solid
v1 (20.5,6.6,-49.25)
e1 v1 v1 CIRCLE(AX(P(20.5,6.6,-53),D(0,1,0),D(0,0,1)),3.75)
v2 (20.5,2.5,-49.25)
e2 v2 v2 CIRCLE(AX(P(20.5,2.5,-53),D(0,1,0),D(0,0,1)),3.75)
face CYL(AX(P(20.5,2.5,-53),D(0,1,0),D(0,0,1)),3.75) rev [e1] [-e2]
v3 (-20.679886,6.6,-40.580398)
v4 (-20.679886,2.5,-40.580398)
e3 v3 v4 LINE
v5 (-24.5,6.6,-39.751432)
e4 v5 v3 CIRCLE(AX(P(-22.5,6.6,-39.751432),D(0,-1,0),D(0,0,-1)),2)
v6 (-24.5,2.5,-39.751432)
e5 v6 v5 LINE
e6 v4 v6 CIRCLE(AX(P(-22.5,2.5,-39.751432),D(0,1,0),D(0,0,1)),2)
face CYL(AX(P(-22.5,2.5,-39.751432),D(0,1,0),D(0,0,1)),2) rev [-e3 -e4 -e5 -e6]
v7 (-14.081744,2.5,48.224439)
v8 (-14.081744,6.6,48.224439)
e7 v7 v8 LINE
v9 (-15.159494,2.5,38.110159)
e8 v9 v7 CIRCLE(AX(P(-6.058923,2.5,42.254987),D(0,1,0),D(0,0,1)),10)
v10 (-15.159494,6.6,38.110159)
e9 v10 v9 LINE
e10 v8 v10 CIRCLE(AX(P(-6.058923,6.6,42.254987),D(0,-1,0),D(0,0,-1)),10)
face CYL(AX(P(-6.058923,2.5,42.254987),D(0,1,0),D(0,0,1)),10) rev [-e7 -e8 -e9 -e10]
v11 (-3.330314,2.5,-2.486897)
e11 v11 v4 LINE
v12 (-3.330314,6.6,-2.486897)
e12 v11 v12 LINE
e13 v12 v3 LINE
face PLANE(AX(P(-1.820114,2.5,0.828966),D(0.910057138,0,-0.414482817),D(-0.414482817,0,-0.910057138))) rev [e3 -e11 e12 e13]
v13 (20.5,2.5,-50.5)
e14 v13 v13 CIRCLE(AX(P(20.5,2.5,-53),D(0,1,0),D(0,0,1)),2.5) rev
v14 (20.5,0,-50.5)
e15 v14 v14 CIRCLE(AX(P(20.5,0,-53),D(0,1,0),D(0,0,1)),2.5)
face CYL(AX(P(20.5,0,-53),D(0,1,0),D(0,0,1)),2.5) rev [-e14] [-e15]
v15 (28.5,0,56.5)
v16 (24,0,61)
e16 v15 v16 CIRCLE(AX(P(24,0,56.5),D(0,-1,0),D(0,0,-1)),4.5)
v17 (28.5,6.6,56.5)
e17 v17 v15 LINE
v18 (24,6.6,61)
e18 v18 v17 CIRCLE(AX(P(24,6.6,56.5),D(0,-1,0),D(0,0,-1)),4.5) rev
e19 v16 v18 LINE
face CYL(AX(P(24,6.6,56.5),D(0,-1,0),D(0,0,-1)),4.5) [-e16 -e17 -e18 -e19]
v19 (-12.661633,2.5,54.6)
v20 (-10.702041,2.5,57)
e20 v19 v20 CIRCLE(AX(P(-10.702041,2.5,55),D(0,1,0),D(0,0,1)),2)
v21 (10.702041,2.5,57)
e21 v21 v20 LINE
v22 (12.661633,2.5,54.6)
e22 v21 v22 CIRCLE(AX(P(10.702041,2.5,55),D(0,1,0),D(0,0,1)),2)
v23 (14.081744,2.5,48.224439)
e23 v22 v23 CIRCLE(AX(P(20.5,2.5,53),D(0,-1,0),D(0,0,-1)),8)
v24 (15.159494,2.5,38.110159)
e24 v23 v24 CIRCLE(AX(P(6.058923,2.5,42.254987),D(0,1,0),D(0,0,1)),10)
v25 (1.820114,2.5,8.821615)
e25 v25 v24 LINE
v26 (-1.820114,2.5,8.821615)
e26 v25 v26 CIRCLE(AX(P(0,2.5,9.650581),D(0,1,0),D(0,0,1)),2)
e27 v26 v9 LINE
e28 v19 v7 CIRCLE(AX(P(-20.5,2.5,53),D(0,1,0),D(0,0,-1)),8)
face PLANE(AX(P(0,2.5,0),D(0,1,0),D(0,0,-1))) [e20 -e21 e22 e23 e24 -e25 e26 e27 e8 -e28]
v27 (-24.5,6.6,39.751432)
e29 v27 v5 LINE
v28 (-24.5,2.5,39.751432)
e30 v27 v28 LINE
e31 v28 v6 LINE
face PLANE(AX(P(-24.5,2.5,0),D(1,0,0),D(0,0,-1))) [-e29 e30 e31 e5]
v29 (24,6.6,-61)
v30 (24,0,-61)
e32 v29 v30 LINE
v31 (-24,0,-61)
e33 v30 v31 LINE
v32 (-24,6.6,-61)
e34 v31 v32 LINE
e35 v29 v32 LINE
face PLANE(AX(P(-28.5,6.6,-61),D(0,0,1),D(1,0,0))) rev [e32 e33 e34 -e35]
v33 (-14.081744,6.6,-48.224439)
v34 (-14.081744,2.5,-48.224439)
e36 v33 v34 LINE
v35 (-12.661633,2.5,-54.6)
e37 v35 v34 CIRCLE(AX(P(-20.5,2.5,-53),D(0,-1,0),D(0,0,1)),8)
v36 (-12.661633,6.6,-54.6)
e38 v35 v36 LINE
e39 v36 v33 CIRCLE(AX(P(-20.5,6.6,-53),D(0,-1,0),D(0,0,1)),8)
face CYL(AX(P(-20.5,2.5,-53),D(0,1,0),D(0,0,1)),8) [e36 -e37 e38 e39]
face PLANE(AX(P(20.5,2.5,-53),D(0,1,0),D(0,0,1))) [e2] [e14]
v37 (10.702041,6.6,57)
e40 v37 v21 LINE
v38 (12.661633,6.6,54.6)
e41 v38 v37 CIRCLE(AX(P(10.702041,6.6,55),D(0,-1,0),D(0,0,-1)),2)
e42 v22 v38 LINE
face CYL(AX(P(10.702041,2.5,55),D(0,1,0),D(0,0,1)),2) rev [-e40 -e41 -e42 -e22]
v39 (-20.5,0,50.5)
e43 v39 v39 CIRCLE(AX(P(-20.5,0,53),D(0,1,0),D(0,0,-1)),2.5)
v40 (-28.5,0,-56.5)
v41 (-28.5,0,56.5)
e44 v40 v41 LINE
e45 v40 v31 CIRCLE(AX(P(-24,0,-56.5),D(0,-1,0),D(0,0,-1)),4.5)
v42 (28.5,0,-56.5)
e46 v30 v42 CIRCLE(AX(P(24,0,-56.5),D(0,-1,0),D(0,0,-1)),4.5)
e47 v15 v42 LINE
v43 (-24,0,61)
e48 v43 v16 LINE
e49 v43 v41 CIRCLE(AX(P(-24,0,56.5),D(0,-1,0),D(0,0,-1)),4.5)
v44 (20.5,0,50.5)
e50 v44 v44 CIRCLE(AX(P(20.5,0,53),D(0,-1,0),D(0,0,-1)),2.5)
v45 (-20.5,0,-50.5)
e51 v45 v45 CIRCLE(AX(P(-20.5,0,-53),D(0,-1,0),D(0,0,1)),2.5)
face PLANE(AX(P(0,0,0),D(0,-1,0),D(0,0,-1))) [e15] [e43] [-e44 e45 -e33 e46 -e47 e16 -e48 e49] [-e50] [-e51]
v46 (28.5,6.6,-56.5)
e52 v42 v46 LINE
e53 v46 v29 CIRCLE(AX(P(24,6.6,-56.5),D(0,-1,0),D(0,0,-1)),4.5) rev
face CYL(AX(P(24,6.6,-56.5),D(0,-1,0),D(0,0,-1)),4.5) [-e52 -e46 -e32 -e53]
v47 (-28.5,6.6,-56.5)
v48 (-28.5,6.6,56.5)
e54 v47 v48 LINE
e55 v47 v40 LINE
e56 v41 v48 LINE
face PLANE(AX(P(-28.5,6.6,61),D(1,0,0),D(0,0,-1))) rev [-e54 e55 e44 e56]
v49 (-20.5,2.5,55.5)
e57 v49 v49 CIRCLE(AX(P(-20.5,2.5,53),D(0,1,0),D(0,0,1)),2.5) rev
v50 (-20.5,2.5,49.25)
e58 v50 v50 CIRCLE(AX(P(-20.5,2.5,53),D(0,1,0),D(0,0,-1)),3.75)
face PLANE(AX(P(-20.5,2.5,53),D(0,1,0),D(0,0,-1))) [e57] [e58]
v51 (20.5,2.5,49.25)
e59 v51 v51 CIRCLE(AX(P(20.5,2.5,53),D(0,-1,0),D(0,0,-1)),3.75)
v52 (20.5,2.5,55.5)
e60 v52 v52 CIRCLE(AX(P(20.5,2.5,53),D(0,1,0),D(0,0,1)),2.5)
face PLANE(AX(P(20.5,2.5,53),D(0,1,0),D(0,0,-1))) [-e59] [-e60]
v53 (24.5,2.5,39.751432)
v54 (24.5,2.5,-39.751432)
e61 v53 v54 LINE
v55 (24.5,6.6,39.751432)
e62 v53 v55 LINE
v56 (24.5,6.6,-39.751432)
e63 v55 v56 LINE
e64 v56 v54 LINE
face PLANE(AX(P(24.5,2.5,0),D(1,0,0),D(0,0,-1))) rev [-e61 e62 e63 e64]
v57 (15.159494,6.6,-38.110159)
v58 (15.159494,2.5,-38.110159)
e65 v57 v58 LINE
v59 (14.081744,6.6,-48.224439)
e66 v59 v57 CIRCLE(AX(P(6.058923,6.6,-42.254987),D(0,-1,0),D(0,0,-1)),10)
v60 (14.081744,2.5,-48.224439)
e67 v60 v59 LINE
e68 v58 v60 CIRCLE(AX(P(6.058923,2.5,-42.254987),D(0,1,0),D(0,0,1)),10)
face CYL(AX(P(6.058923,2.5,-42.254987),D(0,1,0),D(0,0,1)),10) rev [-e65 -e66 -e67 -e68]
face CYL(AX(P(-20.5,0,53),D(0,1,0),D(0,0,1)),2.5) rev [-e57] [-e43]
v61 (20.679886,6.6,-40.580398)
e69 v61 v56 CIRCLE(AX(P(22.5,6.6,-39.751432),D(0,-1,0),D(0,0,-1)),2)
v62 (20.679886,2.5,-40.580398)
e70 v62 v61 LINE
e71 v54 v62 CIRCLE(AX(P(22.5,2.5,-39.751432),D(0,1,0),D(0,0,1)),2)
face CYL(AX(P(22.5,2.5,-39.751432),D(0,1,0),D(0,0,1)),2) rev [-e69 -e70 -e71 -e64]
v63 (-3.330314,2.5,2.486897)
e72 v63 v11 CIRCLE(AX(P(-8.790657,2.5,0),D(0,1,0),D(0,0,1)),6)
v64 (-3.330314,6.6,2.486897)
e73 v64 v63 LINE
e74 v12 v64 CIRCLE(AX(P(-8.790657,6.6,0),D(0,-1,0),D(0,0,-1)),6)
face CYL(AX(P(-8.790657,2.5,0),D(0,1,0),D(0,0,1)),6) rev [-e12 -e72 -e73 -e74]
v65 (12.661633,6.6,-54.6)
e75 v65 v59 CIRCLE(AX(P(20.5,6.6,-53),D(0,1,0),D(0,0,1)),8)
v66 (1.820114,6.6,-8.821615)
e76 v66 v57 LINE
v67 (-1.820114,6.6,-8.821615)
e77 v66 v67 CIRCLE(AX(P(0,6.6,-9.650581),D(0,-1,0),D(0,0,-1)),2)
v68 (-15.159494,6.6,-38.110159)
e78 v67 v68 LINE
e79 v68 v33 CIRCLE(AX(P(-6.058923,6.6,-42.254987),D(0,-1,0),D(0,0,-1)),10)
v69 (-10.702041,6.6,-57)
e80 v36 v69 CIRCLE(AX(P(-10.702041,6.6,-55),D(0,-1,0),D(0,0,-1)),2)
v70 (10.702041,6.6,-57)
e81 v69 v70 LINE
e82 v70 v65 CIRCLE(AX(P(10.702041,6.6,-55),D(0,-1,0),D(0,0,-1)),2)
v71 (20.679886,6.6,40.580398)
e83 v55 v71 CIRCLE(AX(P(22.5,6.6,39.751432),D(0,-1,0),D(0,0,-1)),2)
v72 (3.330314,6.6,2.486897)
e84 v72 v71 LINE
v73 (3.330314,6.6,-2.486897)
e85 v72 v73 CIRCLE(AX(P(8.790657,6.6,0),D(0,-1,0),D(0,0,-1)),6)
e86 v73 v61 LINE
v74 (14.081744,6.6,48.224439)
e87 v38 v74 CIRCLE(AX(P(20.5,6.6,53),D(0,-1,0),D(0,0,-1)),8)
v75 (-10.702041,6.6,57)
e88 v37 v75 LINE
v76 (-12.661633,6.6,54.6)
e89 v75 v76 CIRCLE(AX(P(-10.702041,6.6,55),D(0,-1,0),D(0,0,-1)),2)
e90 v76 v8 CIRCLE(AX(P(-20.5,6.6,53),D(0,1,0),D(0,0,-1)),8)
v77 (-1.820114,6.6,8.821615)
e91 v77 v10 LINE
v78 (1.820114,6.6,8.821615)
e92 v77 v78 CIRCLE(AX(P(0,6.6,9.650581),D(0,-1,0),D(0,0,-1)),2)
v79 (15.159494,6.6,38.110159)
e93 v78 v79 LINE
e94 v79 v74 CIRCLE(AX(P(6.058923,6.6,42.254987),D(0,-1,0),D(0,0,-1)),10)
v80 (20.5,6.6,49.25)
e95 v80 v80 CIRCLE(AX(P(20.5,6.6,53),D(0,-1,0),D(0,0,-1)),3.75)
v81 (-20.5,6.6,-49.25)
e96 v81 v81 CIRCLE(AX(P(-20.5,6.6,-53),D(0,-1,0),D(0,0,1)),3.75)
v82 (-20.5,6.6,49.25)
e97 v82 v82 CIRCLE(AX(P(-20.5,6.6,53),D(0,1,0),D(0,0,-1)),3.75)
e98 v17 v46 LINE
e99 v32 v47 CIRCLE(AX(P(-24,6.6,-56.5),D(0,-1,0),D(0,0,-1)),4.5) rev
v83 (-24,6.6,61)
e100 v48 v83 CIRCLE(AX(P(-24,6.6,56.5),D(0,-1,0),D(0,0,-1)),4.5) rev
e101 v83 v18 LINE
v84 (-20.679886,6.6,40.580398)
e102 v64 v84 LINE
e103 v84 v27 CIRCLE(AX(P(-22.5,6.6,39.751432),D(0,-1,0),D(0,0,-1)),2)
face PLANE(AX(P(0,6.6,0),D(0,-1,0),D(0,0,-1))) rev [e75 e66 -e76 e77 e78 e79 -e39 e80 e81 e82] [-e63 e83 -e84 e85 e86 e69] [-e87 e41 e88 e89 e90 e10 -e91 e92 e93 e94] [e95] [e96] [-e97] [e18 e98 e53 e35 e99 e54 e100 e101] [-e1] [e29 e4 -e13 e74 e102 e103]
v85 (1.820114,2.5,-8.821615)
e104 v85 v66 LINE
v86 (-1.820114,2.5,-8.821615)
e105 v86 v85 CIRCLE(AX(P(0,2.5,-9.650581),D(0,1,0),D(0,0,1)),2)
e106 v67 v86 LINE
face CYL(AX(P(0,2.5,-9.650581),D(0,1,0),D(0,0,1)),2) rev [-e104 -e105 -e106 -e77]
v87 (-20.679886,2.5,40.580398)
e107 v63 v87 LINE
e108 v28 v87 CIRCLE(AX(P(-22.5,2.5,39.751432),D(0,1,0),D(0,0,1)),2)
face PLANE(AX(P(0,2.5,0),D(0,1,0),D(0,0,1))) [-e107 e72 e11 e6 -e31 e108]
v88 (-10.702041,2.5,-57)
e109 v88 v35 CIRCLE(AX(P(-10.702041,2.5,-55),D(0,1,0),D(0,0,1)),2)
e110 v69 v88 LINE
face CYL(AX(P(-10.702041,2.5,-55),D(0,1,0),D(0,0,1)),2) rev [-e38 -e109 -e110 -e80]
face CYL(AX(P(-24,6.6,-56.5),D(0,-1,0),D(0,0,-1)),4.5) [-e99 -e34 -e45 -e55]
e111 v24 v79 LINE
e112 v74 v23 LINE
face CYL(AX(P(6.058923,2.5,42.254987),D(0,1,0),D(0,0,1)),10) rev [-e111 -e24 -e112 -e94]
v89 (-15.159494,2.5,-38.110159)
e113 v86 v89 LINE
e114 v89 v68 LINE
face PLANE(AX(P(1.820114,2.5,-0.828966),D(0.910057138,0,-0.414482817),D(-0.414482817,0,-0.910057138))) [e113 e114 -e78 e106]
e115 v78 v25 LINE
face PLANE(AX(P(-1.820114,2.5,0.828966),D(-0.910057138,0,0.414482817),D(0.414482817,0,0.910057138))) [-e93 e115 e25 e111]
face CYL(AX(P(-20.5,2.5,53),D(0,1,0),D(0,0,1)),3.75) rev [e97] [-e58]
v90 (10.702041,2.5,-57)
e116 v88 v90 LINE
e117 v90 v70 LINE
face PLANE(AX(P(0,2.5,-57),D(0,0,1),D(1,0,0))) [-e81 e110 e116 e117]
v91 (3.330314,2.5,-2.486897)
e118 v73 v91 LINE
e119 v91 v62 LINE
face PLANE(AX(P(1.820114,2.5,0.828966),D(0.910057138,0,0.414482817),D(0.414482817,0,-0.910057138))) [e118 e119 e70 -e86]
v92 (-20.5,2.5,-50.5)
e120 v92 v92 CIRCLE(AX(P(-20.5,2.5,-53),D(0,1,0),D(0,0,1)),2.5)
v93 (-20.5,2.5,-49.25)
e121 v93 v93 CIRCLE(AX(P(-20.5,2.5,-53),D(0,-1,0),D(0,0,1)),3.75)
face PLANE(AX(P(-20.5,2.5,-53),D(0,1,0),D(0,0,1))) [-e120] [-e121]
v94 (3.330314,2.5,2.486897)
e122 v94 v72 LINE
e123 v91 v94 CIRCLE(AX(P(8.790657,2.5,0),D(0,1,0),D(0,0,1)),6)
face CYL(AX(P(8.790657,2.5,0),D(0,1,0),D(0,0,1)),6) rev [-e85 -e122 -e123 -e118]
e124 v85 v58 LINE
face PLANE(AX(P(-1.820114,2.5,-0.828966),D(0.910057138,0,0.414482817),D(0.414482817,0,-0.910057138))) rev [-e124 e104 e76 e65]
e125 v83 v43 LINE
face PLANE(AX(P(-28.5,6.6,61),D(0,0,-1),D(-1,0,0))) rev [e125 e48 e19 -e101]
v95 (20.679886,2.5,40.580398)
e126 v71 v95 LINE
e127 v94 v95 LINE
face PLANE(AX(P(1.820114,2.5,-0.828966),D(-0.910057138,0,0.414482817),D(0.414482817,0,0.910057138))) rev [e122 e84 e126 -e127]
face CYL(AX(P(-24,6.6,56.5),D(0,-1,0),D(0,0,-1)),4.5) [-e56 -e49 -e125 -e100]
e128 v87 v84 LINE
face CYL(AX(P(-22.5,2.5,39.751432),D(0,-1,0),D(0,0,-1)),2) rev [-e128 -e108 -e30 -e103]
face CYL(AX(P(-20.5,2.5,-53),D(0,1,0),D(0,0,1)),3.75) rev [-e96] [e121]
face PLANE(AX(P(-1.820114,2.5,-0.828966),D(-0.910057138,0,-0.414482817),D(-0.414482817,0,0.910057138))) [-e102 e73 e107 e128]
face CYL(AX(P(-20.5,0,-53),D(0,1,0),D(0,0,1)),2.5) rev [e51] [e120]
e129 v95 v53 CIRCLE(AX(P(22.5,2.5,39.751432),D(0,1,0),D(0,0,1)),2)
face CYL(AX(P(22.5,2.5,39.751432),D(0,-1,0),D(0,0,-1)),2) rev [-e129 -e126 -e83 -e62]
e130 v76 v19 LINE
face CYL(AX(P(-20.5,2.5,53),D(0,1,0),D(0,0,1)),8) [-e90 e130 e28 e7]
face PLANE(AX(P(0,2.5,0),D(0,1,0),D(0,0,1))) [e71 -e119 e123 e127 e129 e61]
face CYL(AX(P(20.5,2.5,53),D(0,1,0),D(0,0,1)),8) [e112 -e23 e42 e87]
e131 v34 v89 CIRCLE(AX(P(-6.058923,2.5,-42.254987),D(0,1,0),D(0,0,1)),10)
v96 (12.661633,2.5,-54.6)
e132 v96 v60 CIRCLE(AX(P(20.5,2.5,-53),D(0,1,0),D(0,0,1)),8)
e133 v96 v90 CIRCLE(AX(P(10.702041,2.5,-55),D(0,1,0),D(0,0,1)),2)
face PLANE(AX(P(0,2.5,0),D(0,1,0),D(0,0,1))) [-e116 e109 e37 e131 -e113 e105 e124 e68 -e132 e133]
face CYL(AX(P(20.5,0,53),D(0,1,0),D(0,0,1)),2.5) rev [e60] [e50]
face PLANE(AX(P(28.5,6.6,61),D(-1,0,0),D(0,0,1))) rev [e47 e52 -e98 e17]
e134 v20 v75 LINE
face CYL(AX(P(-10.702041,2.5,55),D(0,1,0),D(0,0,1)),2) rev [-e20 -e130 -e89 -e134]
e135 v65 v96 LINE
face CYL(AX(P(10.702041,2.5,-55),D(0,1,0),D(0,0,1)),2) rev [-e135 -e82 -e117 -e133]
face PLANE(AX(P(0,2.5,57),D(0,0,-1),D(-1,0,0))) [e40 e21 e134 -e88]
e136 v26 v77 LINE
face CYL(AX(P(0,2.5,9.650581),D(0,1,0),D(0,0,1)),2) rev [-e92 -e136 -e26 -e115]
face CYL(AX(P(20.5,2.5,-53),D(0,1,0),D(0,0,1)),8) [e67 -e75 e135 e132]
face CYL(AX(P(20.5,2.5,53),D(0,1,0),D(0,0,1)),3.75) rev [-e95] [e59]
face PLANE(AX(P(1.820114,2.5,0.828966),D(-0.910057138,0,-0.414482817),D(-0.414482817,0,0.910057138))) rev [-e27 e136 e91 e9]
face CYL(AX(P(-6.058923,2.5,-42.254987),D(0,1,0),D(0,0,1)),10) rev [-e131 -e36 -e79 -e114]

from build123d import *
from OCP.BRepFilletAPI import BRepFilletAPI_MakeFillet

# Parameters (mm, degrees)
SKETCH1_W               = 57
SKETCH1_H               = 122
BOSS_EXTRUDE1_DEPTH     = 6.6
FILLET1_R               = 4.5
SKETCH2_R               = 2.5
CUT_EXTRUDE1_DEPTH      = 68.652124874
SKETCH3_R               = 3.75
CUT_EXTRUDE2_DEPTH      = 4.1
MIRROR3_COPY_1_SKETCH_R = 2.5
MIRROR3_COPY_1_DEPTH    = 68.652124874
MIRROR3_COPY_2_SKETCH_R = 3.75
MIRROR3_COPY_2_DEPTH    = 4.1
CUT_EXTRUDE3_DEPTH      = 4.1
FILLET2_R               = 10
FILLET3_R               = 2
FILLET2_OF_MIRROR4_R    = 10
FILLET3_OF_MIRROR4_R    = 2
MIRROR5_START           = 2.5
MIRROR5_DEPTH           = 4.1
FILLET4_R1              = 2
FILLET4_R2              = 6


with BuildPart() as part:
    # Sketch1 → Boss-Extrude1 (new body)
    with BuildSketch(Plane(origin=(0, 0, 0), x_dir=(1, 0, 0), z_dir=(0, 1, 0))):
        Rectangle(SKETCH1_W, SKETCH1_H)
    extrude(amount=BOSS_EXTRUDE1_DEPTH)

    # Fillet1
    fillet1_edges = [part.edges().sort_by_distance(p)[0] for p in [
        (28.5, 3.3, 61),
        (-28.5, 3.3, 61),
        (-28.5, 3.3, -61),
        (28.5, 3.3, -61),
    ]]
    fillet(fillet1_edges, radius=FILLET1_R)

    # Sketch2 → Cut-Extrude1 (cut, through all)
    with BuildSketch(Plane(origin=(0, 6.6, 0), x_dir=(1, 0, 0), z_dir=(0, 1, 0))):
        with Locations(Location((20.5, 53, 0), (0, 0, 270))):
            Circle(SKETCH2_R)
    cut_extrude1 = extrude(amount=-CUT_EXTRUDE1_DEPTH, mode=Mode.SUBTRACT)

    # Sketch3 → Cut-Extrude2 (cut)
    with BuildSketch(Plane(origin=(0, 6.6, 0), x_dir=(1, 0, 0), z_dir=(0, 1, 0))):
        with Locations(Location((20.5, 53, 0), (0, 0, 270))):
            Circle(SKETCH3_R)
    cut_extrude2 = extrude(amount=-CUT_EXTRUDE2_DEPTH, mode=Mode.SUBTRACT)

    # Mirror1: Cut-Extrude1, Cut-Extrude2 across plane
    add(cut_extrude1.mirror(Plane(origin=(0, 0, 0), x_dir=(0, 0, 1), z_dir=(1, 0, 0))), mode=Mode.SUBTRACT)
    add(cut_extrude2.mirror(Plane(origin=(0, 0, 0), x_dir=(0, 0, 1), z_dir=(1, 0, 0))), mode=Mode.SUBTRACT)

    # Mirror3: Cut-Extrude1, Cut-Extrude2 across plane
    add(cut_extrude1.mirror(Plane.XY), mode=Mode.SUBTRACT)
    add(cut_extrude2.mirror(Plane.XY), mode=Mode.SUBTRACT)

    # Mirror3 copy 1 sketch → Mirror3 copy 1 (cut, through all)
    with BuildSketch(Plane(origin=(0, 6.6, 0), x_dir=(-1, 0, 0), z_dir=(0, 1, 0))):
        with Locations(Location((20.5, 53, 0), (0, 0, 270))):
            Circle(MIRROR3_COPY_1_SKETCH_R)
    extrude(amount=-MIRROR3_COPY_1_DEPTH, mode=Mode.SUBTRACT)

    # Mirror3 copy 2 sketch → Mirror3 copy 2 (cut)
    with BuildSketch(Plane(origin=(0, 6.6, 0), x_dir=(-1, 0, 0), z_dir=(0, 1, 0))):
        with Locations(Location((20.5, 53, 0), (0, 0, 270))):
            Circle(MIRROR3_COPY_2_SKETCH_R)
    extrude(amount=-MIRROR3_COPY_2_DEPTH, mode=Mode.SUBTRACT)

    # Sketch4 → Cut-Extrude3 (cut)
    with BuildSketch(Plane(origin=(0, 6.6, 0), x_dir=(1, 0, 0), z_dir=(0, 1, 0))):
        with BuildLine():
            Line((0, 57), (0, 4.825290504))
            Line((0, 4.825290504), (18.422458297, 45.274469567))
            ThreePointArc((18.422458297, 45.274469567), (13.107579799, 49.941875809), (13.57179677, 57))
            Line((13.57179677, 57), (0, 57))
        make_face()
        with BuildLine():
            Line((24.5, 0), (24.5, 46.07179677))
            ThreePointArc((24.5, 46.07179677), (23.697246566, 45.666677806), (22.854101194, 45.354203274))
            Line((22.854101194, 45.354203274), (2.197664208, 0))
            Line((2.197664208, 0), (24.5, 0))
        make_face()
    cut_extrude3 = extrude(amount=-CUT_EXTRUDE3_DEPTH, mode=Mode.SUBTRACT)

    # Fillet2
    # the kernel refuses this fillet: 10 mm, written as the material it adds along each edge
    with BuildSketch(Plane(origin=(22.854101194, 6.6, -45.354203274), x_dir=(0.9166652742214988, 0, -0.3996558207213108), z_dir=(0, -1, 0))) as fillet2_piece_1:
        with BuildLine():
            CenterArc((4.145887895, 9.719866853), FILLET2_R, 228.043415152, 28.362844717)
            Line((-2.539785162, 2.28335048), (-2.673498623, 2.134620152))
            Line((-2.673498623, 2.134620152), (-0.133713461, -0.148730327))
            Line((-0.133713461, -0.148730327), (0.022444109, -0.198736665))
            ThreePointArc((0.022444109, -0.198736665), (0.897764349, -0.149466597), (1.748521514, -0.194397337))
            Line((1.748521514, -0.194397337), (1.795528698, 0))
        make_face()
    extrude(amount=4.1)
    with BuildSketch(Plane(origin=(18.422458297, 6.6, -45.274469567), x_dir=(-0.41448281678671633, 0, 0.9100571380899934), z_dir=(0, -1, 0))) as fillet2_piece_2:
        with BuildLine():
            CenterArc((7.872374254, 10), FILLET2_R, 208.861826981, 61.138173019)
            Line((-0.885488916, 5.173009977), (-1.06064618, 5.076470177))
            ThreePointArc((-1.06064618, 5.076470177), (-0.203601176, 2.627440291), (-0.197294486, 0.032785449))
            Line((-0.197294486, 0.032785449), (0, -0.2))
            Line((0, -0.2), (7.872374254, -0.2))
            Line((7.872374254, -0.2), (7.872374254, 0))
        make_face()
    extrude(amount=4.1)

    # Fillet3
    # the kernel refuses this fillet: 2 mm, written as the material it adds along each edge
    with BuildSketch(Plane(origin=(13.57179677, 6.6, -57), x_dir=(-0.3545926272331019, 0, 0.9350208921259068), z_dir=(0, -1, 0))) as fillet3_piece_1:
        with BuildLine():
            CenterArc((2.887636012, 1.974096319), FILLET3_R, 159.231520484, 101.536959033)
            Line((1.017594228, 2.683281573), (0, 0))
            ThreePointArc((0, 0), (1.283393783, 0.103614726), (2.566787566, 0))
        make_face()
    extrude(amount=4.1)
    with BuildSketch(Plane(origin=(24.5, 6.6, -46.07179677), x_dir=(-0.5710655658719064, 0, 0.8209044520986588), z_dir=(0, -1, 0))) as fillet3_piece_2:
        with BuildLine():
            CenterArc((6.330546511, -1.967533641), FILLET3_R, 79.662186843, 155.513248783)
            Line((5.18841538, -3.609342545), (5.074202266, -3.773523436))
            Line((5.074202266, -3.773523436), (-0.114213113, -0.16418089))
            Line((-0.114213113, -0.16418089), (-0.061886493, 0.190184284))
            ThreePointArc((-0.061886493, 0.190184284), (4.924730005, 0.525207358), (6.725339822, 0.196753364))
            Line((6.725339822, 0.196753364), (6.689449521, 0))
        make_face()
    extrude(amount=4.1)

    # Mirror4: Cut-Extrude3 across plane
    add(cut_extrude3.mirror(Plane(origin=(0, 0, 0), x_dir=(0, 0, 1), z_dir=(1, 0, 0))), mode=Mode.SUBTRACT)

    # Fillet2 of Mirror4
    # the kernel refuses this fillet: 10 mm, written as the material it adds along each edge
    with BuildSketch(Plane(origin=(-22.854101194, 6.6, -45.354203274), x_dir=(0.4144828167867165, 0, 0.9100571380899934), z_dir=(0, -1, 0))) as fillet2_of_mirror4_piece_1:
        with BuildLine():
            CenterArc((3.415288872, 10), FILLET2_OF_MIRROR4_R, 241.637155283, 28.362844717)
            Line((-1.335247856, 1.200431784), (-1.43025859, 1.024440419))
            ThreePointArc((-1.43025859, 1.024440419), (-0.767552408, 0.489064812), (-0.149559435, -0.132785449))
            Line((-0.149559435, -0.132785449), (0, -0.2))
            Line((0, -0.2), (3.415288872, -0.2))
            Line((3.415288872, -0.2), (3.415288872, 0))
        make_face()
    extrude(amount=4.1)
    with BuildSketch(Plane(origin=(-18.422458297, 6.6, -45.274469567), x_dir=(0.8270785739825625, 0, -0.5620863211811608), z_dir=(0, -1, 0))) as fillet2_of_mirror4_piece_2:
        with BuildLine():
            CenterArc((8.528405442, 9.446723083), FILLET2_OF_MIRROR4_R, 189.713452681, 61.138173019)
            Line((-1.328233375, 7.759514966), (-1.525366151, 7.725770803))
            Line((-1.525366151, 7.725770803), (-0.197132776, -0.033744162))
            Line((-0.197132776, -0.033744162), (0.065603119, -0.188934462))
            ThreePointArc((0.065603119, -0.188934462), (2.624124751, 0.242621533), (5.182646384, -0.188934462))
            Line((5.182646384, -0.188934462), (5.248249503, 0))
        make_face()
    extrude(amount=4.1)

    # Fillet3 of Mirror4
    # the kernel refuses this fillet: 2 mm, written as the material it adds along each edge
    with BuildSketch(Plane(origin=(-13.57179677, 6.6, -57), x_dir=(0.35459262723310125, 0, 0.935020892125907), z_dir=(0, -1, 0))) as fillet3_of_mirror4_piece_1:
        with BuildLine():
            CenterArc((2.887636012, -1.974096319), FILLET3_OF_MIRROR4_R, 99.231520484, 101.536959033)
            Line((1.017594228, -2.683281573), (0, 0))
            ThreePointArc((0, 0), (1.283393783, -0.103614726), (2.566787566, 0))
        make_face()
    extrude(amount=4.1)
    with BuildSketch(Plane(origin=(-24.5, 6.6, -46.07179677), x_dir=(0.5710655658719064, 0, 0.8209044520986588), z_dir=(0, -1, 0))) as fillet3_of_mirror4_piece_2:
        with BuildLine():
            CenterArc((6.330546511, 1.967533641), FILLET3_OF_MIRROR4_R, 124.824564374, 155.513248783)
            Line((5.18841538, 3.609342545), (5.074202266, 3.773523436))
            Line((5.074202266, 3.773523436), (-0.114213113, 0.16418089))
            Line((-0.114213113, 0.16418089), (-0.061886493, -0.190184284))
            ThreePointArc((-0.061886493, -0.190184284), (4.924730005, -0.525207358), (6.725339822, -0.196753364))
            Line((6.725339822, -0.196753364), (6.689449521, 0))
        make_face()
    extrude(amount=4.1)

    # Mirror5: read off the stored shape, not the designer's step
    # Mirror5 outline → Mirror5 (cut)
    with BuildSketch(Plane(origin=(0, 0, 0), x_dir=(1, 0, 0), z_dir=(0, 1, 0)).offset(MIRROR5_START)):
        with BuildLine():
            Line((-20.679885724, -40.580397876), (-2.197664208, 0))
            Line((-2.197664208, 0), (-24.5, 0))
            Line((-24.5, 0), (-24.5, -39.751432242))
            ThreePointArc((-24.5, -39.751432242), (-22.924129372, -41.705943505), (-20.679885724, -40.580397876))
        make_face()
        with BuildLine():
            ThreePointArc((20.679885724, -40.580397876), (22.924129372, -41.705943505), (24.5, -39.751432242))
            Line((24.5, -39.751432242), (24.5, 0))
            Line((24.5, 0), (2.197664208, 0))
            Line((2.197664208, 0), (20.679885724, -40.580397876))
        make_face()
        with BuildLine():
            Line((15.159494442, -38.110159183), (0, -4.825290504))
            Line((0, -4.825290504), (-15.159494442, -38.110159183))
            ThreePointArc((-15.159494442, -38.110159183), (-16.002629649, -43.314562397), (-14.081743582, -48.224438823))
            ThreePointArc((-14.081743582, -48.224438823), (-12.69136541, -51.260682364), (-12.661632823, -54.6))
            ThreePointArc((-12.661632823, -54.6), (-12.251234367, -56.264911064), (-10.702041029, -57))
            Line((-10.702041029, -57), (10.702041029, -57))
            ThreePointArc((10.702041029, -57), (12.251234367, -56.264911064), (12.661632823, -54.6))
            ThreePointArc((12.661632823, -54.6), (12.69136541, -51.260682364), (14.081743582, -48.224438823))
            ThreePointArc((14.081743582, -48.224438823), (16.002629649, -43.314562397), (15.159494442, -38.110159183))
        make_face()
    extrude(amount=MIRROR5_DEPTH, mode=Mode.SUBTRACT)

    # Fillet4: one fillet with a radius per group of edges: ONE call of the kernel's fillet builder (fillet() takes one radius for all edges)
    fillet4_edges_1 = [part.edges().sort_by_distance(p)[0] for p in [
        (0, 4.55, -4.825290504),
        (0, 4.55, 4.825290504),
    ]]
    fillet4_edges_2 = [part.edges().sort_by_distance(p)[0] for p in [
        (-2.197664208, 4.55, 0),
        (2.197664208, 4.55, 0),
    ]]
    fillet4 = BRepFilletAPI_MakeFillet(part.part.solid().wrapped)
    for e in fillet4_edges_1:
        fillet4.Add(FILLET4_R1, e.wrapped)
    for e in fillet4_edges_2:
        fillet4.Add(FILLET4_R2, e.wrapped)
    add(Compound.cast(fillet4.Shape()), mode=Mode.REPLACE)


solid = part.part
